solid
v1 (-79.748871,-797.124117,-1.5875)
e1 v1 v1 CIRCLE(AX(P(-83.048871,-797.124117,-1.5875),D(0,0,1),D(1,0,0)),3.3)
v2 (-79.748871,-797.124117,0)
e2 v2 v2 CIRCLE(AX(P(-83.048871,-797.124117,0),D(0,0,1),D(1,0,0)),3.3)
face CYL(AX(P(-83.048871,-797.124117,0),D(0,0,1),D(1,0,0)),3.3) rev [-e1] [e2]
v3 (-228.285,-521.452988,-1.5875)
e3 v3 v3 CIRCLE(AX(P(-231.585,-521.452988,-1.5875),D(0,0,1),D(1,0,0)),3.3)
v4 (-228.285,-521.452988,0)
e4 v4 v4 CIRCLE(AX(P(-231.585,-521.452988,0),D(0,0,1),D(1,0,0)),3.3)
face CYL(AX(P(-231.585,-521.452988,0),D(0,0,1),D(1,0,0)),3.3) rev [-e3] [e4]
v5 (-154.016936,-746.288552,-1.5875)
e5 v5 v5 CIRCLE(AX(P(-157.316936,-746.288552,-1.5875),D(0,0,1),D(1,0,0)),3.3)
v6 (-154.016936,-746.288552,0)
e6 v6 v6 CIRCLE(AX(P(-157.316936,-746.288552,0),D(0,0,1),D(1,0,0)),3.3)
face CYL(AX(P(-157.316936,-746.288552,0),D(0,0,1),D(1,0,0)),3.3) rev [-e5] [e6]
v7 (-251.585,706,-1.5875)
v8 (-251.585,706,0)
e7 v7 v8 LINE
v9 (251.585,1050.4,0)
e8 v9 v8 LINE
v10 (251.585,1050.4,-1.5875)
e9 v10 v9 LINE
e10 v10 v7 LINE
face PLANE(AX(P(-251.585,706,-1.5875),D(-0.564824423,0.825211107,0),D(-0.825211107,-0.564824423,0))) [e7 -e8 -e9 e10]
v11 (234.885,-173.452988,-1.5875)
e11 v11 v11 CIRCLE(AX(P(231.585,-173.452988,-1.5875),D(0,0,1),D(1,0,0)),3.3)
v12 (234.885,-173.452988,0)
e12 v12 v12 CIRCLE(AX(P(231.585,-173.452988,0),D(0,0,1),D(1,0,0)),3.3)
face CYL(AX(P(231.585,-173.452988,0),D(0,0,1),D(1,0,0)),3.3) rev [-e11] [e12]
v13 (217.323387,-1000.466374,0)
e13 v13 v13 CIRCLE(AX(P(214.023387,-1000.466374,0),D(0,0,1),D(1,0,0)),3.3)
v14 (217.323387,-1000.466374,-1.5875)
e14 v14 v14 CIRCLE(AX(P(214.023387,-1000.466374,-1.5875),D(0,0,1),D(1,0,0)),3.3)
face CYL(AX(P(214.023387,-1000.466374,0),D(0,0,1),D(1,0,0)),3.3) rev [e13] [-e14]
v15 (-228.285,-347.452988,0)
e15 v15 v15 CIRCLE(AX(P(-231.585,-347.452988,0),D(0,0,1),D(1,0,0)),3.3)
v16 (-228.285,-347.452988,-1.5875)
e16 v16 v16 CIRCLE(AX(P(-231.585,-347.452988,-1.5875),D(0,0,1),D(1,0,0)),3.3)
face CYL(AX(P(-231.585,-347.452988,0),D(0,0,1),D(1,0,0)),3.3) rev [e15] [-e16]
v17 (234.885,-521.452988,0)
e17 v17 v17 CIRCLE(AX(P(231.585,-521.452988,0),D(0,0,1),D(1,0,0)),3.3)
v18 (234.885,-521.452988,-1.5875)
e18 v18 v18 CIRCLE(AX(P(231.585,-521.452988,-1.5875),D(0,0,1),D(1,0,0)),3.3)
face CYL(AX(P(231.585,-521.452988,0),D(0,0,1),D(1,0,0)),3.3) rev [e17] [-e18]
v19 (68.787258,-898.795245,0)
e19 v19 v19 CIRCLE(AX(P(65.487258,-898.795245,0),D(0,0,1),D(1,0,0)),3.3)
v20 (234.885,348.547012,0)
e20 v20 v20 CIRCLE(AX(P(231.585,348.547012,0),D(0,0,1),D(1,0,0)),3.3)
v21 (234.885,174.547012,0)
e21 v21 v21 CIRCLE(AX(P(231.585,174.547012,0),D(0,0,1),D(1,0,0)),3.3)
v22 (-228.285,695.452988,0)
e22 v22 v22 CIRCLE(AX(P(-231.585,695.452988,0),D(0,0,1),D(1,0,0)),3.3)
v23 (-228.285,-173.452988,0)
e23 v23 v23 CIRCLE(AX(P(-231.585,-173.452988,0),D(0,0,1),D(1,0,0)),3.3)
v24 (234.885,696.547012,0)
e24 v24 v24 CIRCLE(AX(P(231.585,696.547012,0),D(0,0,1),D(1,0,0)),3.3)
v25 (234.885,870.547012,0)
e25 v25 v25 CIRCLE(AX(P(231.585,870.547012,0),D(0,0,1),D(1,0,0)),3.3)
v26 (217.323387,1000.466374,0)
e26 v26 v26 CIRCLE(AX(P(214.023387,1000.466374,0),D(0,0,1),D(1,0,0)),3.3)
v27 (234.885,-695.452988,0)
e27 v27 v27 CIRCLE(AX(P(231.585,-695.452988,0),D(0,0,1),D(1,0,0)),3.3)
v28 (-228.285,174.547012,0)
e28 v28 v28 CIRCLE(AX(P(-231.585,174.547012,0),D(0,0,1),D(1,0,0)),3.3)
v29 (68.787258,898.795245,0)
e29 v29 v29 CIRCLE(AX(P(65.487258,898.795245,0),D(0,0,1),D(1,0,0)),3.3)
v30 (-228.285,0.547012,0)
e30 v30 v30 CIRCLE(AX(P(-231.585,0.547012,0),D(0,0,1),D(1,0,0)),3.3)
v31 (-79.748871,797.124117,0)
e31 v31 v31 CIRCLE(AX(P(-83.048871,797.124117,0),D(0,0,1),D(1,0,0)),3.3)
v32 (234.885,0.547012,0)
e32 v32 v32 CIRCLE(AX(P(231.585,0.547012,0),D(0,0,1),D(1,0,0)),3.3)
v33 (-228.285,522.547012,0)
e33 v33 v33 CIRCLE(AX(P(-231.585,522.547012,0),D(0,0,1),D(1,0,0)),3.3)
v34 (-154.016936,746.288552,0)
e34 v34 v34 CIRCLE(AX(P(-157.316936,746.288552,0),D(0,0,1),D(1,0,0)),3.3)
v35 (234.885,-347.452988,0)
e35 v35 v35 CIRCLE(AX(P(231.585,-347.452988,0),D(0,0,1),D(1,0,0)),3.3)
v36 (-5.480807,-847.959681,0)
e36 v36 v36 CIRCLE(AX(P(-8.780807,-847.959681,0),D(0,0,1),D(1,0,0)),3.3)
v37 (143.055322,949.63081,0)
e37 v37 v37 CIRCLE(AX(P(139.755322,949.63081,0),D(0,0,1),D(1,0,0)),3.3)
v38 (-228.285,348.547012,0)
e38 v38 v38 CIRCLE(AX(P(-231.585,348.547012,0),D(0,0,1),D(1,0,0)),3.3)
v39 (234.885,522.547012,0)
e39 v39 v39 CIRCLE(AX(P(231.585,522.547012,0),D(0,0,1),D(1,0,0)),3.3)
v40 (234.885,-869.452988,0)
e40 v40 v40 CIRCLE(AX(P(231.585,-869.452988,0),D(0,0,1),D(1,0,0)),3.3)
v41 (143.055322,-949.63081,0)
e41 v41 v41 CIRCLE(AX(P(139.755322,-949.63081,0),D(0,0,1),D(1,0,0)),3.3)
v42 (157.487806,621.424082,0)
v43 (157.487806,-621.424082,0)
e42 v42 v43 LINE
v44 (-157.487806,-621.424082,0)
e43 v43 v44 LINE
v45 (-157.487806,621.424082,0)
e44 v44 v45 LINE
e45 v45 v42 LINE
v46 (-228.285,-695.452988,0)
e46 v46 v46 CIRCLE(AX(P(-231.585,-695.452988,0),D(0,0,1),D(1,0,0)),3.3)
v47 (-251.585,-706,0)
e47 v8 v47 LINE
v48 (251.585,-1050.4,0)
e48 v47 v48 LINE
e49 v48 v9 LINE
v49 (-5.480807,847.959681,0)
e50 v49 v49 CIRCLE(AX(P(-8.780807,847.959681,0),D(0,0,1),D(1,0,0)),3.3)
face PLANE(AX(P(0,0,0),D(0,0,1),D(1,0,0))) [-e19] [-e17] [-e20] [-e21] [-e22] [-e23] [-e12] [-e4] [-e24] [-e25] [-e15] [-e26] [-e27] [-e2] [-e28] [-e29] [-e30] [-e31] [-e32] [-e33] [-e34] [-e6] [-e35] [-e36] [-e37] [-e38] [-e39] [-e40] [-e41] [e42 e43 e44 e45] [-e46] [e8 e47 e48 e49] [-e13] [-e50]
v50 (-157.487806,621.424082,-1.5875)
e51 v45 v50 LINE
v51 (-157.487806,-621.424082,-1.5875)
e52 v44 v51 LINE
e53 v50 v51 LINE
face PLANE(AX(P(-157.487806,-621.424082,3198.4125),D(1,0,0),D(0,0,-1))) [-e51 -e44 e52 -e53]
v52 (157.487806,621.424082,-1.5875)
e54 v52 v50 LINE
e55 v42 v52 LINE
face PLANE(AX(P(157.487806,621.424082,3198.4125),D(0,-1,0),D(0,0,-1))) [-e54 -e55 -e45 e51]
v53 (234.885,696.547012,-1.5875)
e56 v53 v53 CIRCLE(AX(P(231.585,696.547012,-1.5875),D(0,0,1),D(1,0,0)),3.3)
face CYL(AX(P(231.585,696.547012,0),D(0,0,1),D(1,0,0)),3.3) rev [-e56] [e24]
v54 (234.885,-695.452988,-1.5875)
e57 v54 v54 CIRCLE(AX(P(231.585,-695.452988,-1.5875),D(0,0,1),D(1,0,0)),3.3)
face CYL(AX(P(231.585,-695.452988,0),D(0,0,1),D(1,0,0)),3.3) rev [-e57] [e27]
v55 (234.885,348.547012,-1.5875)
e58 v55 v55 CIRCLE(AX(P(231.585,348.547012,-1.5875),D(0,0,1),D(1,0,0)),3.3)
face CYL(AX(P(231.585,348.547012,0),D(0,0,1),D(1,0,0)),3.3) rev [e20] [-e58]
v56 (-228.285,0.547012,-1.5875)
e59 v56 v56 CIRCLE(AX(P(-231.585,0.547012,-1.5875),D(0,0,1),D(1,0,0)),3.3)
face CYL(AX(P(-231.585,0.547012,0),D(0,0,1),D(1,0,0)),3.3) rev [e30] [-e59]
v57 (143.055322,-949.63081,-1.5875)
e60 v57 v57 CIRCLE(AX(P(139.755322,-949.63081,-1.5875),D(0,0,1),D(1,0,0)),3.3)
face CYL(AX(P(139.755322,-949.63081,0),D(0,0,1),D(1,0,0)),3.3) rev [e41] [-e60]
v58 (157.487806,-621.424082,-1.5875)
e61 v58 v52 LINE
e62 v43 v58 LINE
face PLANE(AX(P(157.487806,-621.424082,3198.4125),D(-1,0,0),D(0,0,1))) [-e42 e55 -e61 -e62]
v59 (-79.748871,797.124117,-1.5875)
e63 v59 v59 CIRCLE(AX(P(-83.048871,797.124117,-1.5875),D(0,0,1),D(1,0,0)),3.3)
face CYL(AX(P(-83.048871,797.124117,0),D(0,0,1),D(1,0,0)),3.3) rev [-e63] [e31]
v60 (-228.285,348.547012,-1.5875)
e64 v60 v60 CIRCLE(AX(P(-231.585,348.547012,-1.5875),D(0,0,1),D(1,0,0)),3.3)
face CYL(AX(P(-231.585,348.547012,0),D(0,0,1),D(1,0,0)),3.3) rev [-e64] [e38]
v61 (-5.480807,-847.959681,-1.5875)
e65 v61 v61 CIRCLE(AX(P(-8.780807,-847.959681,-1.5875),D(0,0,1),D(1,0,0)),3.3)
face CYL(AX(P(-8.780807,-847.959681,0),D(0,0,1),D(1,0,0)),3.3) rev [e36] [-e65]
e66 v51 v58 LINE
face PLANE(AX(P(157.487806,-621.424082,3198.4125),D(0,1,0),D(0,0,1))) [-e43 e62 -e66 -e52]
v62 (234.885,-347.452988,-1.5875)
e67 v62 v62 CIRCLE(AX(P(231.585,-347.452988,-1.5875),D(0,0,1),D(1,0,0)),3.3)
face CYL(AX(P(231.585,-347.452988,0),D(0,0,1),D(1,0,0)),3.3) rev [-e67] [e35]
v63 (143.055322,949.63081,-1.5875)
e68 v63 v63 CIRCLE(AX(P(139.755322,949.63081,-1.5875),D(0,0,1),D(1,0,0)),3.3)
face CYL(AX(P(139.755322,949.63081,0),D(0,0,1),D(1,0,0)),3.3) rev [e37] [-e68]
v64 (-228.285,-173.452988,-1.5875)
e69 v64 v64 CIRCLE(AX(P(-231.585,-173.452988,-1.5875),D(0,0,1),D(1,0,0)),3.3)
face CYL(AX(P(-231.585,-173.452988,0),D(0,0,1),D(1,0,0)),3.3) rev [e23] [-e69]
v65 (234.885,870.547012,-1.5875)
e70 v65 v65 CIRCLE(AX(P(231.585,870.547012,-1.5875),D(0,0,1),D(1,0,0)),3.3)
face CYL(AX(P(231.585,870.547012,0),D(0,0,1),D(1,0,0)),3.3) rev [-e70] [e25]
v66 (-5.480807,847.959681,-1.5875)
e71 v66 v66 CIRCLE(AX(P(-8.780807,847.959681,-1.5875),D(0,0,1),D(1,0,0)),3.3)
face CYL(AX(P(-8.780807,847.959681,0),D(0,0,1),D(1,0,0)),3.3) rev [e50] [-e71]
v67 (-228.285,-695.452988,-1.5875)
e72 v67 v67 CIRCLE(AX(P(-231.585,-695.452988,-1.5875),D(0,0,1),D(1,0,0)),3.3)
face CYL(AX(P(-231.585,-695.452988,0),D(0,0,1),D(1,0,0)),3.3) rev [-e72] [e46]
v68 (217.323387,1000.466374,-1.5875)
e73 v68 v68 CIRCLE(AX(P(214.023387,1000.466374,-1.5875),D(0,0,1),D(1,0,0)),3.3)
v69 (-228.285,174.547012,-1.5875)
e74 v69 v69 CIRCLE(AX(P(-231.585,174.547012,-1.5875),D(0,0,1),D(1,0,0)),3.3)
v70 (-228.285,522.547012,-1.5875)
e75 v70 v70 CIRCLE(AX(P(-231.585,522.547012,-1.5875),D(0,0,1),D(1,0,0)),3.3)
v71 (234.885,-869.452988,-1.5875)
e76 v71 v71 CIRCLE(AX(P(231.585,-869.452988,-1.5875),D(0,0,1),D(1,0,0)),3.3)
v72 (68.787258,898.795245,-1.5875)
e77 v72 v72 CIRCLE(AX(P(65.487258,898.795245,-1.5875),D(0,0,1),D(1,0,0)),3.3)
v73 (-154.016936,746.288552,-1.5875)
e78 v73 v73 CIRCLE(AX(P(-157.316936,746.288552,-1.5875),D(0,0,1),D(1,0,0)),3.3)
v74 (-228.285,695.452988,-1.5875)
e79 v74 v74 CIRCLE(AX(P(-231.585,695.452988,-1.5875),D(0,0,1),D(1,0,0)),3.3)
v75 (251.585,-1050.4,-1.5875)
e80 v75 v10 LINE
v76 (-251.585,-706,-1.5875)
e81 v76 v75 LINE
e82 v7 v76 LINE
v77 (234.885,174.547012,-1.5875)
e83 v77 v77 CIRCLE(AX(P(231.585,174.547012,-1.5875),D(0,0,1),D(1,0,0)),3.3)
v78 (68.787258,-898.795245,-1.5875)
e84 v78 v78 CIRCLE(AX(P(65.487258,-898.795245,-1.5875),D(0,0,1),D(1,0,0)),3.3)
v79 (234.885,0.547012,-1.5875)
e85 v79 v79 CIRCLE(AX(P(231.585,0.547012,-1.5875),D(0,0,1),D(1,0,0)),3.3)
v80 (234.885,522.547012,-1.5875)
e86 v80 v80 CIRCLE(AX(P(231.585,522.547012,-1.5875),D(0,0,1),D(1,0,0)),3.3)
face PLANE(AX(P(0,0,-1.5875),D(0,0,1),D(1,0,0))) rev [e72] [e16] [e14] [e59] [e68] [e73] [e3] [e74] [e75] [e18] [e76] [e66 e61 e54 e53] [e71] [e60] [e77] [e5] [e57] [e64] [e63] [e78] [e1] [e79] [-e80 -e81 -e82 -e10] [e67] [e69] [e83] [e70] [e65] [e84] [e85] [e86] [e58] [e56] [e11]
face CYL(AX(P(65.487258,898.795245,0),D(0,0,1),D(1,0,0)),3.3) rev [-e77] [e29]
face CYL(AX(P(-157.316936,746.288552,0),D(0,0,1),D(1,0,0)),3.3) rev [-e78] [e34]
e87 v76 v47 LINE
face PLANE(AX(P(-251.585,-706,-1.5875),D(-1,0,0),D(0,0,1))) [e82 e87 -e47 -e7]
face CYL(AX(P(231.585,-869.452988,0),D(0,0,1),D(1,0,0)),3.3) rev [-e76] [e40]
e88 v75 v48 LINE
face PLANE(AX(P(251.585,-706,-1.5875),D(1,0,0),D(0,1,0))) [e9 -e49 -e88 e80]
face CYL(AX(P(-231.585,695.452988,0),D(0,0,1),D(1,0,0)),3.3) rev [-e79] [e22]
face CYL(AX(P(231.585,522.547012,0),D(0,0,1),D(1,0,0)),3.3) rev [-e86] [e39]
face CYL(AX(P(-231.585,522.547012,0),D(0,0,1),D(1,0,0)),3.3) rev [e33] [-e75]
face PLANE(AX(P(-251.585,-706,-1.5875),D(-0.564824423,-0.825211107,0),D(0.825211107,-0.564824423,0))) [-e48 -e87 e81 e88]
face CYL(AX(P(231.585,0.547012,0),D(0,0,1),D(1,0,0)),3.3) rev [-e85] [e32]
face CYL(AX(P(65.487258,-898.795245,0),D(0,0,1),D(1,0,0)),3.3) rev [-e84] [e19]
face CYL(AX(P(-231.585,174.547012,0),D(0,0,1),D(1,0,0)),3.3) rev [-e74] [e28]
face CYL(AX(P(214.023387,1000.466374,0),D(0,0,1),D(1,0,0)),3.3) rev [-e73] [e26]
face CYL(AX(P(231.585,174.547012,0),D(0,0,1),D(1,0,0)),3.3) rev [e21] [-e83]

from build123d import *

# Parameters (mm, degrees)
BRIDA_BASE1_DEPTH            = 1.5875
TALADRO_DE_MARGEN_PARA_M61_D = 6.6
CROQUIS7_W                   = 314.97561102
CROQUIS7_H                   = 1242.8481637
CORTAR_EXTRUIR2_DEPTH        = 3200


# Sheet-metal steps are written as plain solids
with BuildPart() as part:
    # Croquis1 → Brida base1 (new body)
    with BuildSketch(Plane.XY):
        Polygon((-251.585, -706), (251.585, -1050.4), (251.585, -706), (251.585, 706), (251.585, 1050.4), (-251.585, 706), align=None)
    extrude(amount=-BRIDA_BASE1_DEPTH)

    # Taladro de margen para M61 (through all)
    with Locations(Plane.XY):
        with Locations((-231.585, 695.452987896), (-157.316935544, 746.288552238), (-83.048871087, 797.124116579), (-8.780806631, 847.95968092), (65.487257826, 898.795245261), (139.755322282, 949.630809603), (214.023386739, 1000.466373944), (65.487257826, -898.795245261), (-8.780806631, -847.95968092), (-83.048871087, -797.124116579), (-157.316935544, -746.288552238), (-231.585, -695.452987896), (214.023386739, -1000.466373944), (139.755322282, -949.630809603), (-231.585, -521.452987896), (-231.585, -347.452987896), (-231.585, -173.452987896), (-231.585, 0.547012104), (-231.585, 174.547012104), (-231.585, 348.547012104), (-231.585, 522.547012104), (231.585, 522.547012104), (231.585, 348.547012104), (231.585, 174.547012104), (231.585, 0.547012104), (231.585, -173.452987896), (231.585, -347.452987896), (231.585, -521.452987896), (231.585, -695.452987896), (231.585, -869.452987896), (231.585, 696.547012104), (231.585, 870.547012104)):
            Hole(TALADRO_DE_MARGEN_PARA_M61_D / 2)

    # Croquis7 → Cortar-Extruir2 (cut)
    with BuildSketch(Plane.XY.offset(-1.5875)):
        Rectangle(CROQUIS7_W, CROQUIS7_H)
    extrude(amount=CORTAR_EXTRUIR2_DEPTH, mode=Mode.SUBTRACT)


solid = part.part
